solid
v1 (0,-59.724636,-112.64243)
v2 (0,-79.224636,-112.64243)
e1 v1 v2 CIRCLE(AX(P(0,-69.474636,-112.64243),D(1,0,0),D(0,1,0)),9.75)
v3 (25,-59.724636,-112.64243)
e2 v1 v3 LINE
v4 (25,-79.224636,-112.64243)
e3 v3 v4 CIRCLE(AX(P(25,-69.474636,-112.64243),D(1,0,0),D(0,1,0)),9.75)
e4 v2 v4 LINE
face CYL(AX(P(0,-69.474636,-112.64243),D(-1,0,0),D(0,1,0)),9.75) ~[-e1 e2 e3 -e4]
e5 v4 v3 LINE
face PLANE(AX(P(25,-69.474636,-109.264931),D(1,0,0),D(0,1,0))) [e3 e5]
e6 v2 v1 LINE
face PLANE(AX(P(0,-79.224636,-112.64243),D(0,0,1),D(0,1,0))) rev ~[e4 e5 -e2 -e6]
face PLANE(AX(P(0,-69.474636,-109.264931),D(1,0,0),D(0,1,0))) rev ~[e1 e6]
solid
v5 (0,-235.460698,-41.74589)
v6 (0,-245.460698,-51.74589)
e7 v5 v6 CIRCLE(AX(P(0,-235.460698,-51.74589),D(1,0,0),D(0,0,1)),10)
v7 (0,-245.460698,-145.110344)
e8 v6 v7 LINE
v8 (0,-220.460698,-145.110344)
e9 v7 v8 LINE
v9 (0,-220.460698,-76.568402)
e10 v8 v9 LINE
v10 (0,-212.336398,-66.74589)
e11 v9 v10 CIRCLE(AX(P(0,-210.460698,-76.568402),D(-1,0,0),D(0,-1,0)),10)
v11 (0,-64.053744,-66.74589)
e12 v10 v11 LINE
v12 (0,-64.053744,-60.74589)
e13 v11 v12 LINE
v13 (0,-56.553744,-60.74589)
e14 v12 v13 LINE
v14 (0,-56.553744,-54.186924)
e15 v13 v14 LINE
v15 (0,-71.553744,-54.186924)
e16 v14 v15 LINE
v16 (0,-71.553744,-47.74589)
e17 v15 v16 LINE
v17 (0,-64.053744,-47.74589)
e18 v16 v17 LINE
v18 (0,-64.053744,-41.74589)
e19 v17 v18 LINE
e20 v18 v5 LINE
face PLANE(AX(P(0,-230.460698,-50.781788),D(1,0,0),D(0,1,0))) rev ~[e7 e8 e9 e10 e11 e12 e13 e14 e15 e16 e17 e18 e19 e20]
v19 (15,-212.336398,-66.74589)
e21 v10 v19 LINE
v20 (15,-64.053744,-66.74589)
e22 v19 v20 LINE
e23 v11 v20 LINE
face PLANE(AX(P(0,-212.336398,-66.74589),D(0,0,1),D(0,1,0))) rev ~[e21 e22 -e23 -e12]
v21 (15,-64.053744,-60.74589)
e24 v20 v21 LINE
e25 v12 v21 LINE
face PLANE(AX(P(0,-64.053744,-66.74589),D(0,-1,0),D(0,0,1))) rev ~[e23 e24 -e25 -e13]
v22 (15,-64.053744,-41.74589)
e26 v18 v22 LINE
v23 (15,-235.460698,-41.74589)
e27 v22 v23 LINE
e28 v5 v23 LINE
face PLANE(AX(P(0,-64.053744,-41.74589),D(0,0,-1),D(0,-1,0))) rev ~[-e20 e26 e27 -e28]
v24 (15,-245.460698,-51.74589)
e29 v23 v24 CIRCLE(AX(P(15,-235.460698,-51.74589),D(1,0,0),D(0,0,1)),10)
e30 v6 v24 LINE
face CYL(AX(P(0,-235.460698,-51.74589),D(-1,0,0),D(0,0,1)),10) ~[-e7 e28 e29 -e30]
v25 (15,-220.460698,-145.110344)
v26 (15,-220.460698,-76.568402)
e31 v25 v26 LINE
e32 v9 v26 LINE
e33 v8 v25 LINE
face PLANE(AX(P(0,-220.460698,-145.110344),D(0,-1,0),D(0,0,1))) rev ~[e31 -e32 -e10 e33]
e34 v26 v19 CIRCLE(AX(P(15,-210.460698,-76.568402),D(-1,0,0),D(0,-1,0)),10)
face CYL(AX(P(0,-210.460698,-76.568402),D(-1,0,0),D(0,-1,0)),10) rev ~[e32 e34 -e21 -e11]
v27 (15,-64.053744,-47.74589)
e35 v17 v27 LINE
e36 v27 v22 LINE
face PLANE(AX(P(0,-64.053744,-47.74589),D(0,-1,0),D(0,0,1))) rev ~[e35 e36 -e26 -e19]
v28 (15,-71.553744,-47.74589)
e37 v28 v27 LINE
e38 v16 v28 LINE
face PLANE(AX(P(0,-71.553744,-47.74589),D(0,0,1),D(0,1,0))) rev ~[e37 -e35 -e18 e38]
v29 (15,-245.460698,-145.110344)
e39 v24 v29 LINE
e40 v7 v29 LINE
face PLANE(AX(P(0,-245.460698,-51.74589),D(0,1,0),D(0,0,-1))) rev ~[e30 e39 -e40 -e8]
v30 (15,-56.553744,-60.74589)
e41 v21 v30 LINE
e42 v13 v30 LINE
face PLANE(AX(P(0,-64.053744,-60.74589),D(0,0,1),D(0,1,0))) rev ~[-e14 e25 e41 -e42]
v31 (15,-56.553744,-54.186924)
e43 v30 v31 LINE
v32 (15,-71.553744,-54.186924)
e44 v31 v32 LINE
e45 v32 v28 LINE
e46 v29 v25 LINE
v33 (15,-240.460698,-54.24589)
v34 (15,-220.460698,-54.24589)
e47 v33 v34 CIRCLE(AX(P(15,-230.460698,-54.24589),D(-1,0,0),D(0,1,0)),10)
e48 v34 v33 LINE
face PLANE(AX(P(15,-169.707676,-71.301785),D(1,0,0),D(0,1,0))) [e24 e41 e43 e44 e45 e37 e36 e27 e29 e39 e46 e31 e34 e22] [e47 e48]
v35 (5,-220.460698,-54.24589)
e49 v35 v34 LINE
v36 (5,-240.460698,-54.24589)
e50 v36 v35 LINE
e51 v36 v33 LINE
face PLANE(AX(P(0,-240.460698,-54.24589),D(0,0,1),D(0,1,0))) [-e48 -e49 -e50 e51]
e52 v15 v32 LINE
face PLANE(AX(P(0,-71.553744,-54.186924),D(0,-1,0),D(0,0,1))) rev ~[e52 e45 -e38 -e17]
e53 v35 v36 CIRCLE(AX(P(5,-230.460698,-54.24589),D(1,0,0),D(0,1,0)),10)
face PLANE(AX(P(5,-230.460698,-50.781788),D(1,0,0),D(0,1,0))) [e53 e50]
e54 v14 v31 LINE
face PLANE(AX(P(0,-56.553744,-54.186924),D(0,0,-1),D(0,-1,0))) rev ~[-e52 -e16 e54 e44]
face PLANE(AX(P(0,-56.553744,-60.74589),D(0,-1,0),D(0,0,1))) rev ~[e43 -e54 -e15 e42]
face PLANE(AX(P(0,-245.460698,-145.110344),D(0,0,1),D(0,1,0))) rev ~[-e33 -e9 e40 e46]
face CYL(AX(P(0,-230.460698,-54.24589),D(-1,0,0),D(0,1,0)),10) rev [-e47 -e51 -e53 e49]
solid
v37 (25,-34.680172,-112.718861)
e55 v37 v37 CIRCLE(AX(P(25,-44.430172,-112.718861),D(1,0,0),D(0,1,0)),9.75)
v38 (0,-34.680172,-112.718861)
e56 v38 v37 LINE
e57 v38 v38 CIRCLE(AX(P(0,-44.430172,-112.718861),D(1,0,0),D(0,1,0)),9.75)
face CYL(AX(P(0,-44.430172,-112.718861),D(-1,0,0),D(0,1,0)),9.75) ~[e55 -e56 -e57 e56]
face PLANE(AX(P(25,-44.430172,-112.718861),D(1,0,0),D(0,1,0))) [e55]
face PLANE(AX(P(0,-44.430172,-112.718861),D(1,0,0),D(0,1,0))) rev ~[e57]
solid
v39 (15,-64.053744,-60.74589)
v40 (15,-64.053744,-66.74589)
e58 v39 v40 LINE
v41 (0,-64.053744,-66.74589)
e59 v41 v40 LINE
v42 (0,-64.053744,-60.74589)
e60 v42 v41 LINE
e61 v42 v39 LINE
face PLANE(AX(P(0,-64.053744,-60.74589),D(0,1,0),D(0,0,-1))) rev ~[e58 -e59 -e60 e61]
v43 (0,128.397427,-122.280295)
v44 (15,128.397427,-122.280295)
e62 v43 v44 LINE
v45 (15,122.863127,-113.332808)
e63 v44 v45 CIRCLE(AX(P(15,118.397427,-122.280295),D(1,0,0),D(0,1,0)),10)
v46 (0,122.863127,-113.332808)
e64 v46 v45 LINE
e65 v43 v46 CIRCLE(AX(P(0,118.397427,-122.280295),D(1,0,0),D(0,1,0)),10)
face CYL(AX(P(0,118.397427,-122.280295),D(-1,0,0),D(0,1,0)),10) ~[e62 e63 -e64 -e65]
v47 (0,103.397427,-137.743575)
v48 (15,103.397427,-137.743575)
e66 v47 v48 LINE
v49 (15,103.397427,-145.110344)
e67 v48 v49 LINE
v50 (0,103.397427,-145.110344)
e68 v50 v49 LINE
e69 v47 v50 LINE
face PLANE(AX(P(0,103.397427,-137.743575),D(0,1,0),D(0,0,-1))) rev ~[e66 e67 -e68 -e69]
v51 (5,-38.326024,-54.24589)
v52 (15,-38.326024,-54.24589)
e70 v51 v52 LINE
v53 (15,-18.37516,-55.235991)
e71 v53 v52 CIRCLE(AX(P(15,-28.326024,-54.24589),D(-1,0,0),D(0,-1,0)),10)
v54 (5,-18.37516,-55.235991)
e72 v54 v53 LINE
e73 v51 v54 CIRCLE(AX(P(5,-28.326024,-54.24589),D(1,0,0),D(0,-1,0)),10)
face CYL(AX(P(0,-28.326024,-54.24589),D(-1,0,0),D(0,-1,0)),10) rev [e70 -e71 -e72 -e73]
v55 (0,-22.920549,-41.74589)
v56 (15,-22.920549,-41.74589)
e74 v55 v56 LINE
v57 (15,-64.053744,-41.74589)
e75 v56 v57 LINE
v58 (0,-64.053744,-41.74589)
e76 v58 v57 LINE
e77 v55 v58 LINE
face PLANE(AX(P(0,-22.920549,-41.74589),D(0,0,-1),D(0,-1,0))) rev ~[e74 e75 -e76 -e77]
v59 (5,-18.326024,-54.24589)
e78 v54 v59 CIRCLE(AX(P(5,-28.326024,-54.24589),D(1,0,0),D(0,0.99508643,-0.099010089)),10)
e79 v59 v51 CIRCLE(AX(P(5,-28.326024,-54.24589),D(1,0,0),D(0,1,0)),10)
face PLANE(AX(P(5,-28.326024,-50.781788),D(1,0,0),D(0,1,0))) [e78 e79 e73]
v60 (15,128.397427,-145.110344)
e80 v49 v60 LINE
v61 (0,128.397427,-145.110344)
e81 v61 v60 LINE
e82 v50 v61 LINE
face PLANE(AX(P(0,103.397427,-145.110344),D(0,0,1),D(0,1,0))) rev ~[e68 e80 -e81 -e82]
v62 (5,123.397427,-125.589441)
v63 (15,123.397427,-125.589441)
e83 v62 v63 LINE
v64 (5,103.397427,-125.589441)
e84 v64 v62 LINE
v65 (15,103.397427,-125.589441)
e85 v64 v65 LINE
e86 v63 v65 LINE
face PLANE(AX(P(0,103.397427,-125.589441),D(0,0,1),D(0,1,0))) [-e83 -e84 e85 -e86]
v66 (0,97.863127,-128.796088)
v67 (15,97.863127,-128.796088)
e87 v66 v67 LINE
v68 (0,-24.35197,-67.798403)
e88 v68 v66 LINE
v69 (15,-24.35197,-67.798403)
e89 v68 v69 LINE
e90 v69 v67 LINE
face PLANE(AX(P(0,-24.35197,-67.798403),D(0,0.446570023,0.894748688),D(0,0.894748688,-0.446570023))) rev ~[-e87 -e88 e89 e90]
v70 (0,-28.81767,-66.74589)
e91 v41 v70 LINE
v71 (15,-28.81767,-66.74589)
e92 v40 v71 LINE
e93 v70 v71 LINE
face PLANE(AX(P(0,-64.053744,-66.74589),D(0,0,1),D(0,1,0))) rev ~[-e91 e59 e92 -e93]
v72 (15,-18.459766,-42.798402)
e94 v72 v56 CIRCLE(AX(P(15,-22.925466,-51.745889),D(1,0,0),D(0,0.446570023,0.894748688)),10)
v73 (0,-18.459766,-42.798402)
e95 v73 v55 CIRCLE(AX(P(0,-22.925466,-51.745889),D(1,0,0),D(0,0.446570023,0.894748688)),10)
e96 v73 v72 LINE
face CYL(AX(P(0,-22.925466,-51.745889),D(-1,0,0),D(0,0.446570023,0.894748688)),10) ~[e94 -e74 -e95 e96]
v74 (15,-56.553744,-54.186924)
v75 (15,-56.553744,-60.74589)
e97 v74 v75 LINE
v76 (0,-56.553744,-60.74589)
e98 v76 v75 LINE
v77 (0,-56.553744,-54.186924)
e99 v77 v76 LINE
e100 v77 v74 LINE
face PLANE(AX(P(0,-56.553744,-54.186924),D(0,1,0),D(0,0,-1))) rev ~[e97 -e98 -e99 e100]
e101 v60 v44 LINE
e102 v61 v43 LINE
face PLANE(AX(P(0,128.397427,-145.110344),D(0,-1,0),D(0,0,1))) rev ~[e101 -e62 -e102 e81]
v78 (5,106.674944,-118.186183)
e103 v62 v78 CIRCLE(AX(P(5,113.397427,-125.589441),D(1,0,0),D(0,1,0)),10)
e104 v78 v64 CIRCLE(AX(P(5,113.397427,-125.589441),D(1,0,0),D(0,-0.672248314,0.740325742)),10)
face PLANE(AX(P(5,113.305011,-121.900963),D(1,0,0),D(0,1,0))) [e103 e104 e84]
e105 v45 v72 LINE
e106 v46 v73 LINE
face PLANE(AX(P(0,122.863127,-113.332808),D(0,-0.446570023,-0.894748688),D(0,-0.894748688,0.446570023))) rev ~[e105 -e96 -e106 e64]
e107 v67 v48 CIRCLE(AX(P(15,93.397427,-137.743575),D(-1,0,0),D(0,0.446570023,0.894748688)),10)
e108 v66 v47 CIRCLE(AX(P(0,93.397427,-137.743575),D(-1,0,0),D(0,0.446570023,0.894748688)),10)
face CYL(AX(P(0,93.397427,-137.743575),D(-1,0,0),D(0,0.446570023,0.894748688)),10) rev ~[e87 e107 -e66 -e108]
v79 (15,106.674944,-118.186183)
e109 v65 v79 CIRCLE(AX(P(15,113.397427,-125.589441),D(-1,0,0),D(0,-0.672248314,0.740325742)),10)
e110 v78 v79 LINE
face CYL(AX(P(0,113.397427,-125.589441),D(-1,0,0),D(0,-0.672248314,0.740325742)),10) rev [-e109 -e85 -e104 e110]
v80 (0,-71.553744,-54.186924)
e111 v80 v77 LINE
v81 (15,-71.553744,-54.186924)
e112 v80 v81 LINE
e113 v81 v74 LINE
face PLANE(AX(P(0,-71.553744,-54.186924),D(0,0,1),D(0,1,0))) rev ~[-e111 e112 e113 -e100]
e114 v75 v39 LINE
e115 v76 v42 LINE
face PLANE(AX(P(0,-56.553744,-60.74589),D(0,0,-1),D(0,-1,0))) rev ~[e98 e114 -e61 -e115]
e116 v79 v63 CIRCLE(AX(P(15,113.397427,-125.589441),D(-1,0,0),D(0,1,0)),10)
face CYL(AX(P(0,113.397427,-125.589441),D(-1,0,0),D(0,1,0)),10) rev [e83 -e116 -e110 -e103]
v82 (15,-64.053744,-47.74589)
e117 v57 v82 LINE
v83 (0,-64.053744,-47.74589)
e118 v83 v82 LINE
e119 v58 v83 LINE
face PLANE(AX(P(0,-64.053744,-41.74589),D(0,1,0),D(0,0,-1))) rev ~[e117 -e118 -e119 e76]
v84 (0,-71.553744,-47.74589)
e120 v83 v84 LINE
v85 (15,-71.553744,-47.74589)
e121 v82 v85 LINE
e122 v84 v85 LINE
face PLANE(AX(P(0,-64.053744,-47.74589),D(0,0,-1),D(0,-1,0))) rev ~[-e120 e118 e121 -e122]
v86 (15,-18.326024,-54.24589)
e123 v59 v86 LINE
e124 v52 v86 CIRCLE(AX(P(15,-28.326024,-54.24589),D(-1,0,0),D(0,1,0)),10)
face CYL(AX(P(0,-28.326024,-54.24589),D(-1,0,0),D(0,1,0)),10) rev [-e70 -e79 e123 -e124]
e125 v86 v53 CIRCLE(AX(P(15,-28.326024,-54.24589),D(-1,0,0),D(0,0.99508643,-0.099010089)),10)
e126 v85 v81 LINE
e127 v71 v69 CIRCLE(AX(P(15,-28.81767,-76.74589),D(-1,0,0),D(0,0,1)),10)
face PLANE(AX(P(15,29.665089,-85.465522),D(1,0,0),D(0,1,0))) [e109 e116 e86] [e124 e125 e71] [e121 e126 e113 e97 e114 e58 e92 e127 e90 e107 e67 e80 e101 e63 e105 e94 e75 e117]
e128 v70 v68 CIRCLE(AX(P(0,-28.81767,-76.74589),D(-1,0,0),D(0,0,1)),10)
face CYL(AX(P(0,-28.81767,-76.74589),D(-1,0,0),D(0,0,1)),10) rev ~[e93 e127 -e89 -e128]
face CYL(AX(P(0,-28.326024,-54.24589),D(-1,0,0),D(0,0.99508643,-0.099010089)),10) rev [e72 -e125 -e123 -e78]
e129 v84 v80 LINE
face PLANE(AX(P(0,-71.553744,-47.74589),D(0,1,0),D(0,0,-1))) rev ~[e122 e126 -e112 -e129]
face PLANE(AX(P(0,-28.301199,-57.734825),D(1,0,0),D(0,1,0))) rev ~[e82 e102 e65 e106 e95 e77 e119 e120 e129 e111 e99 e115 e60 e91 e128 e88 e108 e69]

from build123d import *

# Parameters (mm, degrees)
F3_DEPTH  = 15
F4_DEPTH  = 25
F5_DEPTH  = 15
F6_DEPTH  = 25
F7_DEPTH  = 25
F8_R      = 9.75
F9_DEPTH  = 25
F10_DEPTH = 5
F11_DEPTH = 5
F12_DEPTH = 5


with BuildPart() as f3:
    # F2 (on Right) → F3 (new body)
    with BuildSketch(Plane.YZ):
        with BuildLine():
            Line((-64.0537443757, -47.7458898533), (-64.0537443757, -41.7458898533))
            Line((-64.0537443757, -41.7458898533), (-235.4606981414, -41.7458898533))
            ThreePointArc((-235.4606981414, -41.7458898533), (-242.5317659533, -44.6748220415), (-245.4606981414, -51.7458898533))
            Line((-245.4606981414, -51.7458898533), (-245.4606981414, -145.1103440631))
            Line((-245.4606981414, -145.1103440631), (-220.4606981414, -145.1103440631))
            Line((-220.4606981414, -145.1103440631), (-220.4606981414, -76.5684022923))
            ThreePointArc((-220.4606981414, -76.5684022923), (-218.1664426563, -70.1949023534), (-212.336397847, -66.7458898533))
            Line((-212.336397847, -66.7458898533), (-64.0537443757, -66.7458898533))
            Line((-64.0537443757, -66.7458898533), (-64.0537443757, -60.7458898533))
            Line((-64.0537443757, -60.7458898533), (-56.5537443757, -60.7458898533))
            Line((-56.5537443757, -60.7458898533), (-56.5537443757, -54.18692423))
            Line((-56.5537443757, -54.18692423), (-71.5537443757, -54.18692423))
            Line((-71.5537443757, -54.18692423), (-71.5537443757, -47.7458898533))
            Line((-71.5537443757, -47.7458898533), (-64.0537443757, -47.7458898533))
        make_face()
    extrude(amount=F3_DEPTH)

    # F1 (on Right) → F4 (cut)
    with BuildSketch(Plane.YZ):
        with BuildLine():
            Line((-230.4606981414, -54.2458898533), (-220.4606981414, -54.2458898533))
            ThreePointArc((-220.4606981414, -54.2458898533), (-230.4606981414, -44.2458898533), (-240.4606981414, -54.2458898533))
            Line((-240.4606981414, -54.2458898533), (-230.4606981414, -54.2458898533))
        make_face()
    extrude(amount=F4_DEPTH, mode=Mode.SUBTRACT)

    # F1 (on Right) → F10 (join)
    with BuildSketch(Plane.YZ):
        with BuildLine():
            Line((-230.4606981414, -54.2458898533), (-220.4606981414, -54.2458898533))
            ThreePointArc((-220.4606981414, -54.2458898533), (-230.4606981414, -44.2458898533), (-240.4606981414, -54.2458898533))
            Line((-240.4606981414, -54.2458898533), (-230.4606981414, -54.2458898533))
        make_face()
    extrude(amount=F10_DEPTH)


with BuildPart() as f5:
    # F2 (on Right) → F5 (new body)
    with BuildSketch(Plane.YZ):
        with BuildLine():
            Line((103.3974266851, -145.1103440631), (128.3974266851, -145.1103440631))
            Line((128.3974266851, -145.1103440631), (128.3974266851, -122.2802950504))
            ThreePointArc((128.3974266851, -122.2802950504), (126.9020431462, -117.0199244505), (122.8631269154, -113.3328081712))
            Line((122.8631269154, -113.3328081712), (-18.4597660903, -42.7984017651))
            ThreePointArc((-18.4597660903, -42.7984017651), (-20.6290450089, -42.0131372779), (-22.9205489159, -41.7458898533))
            Line((-22.9205489159, -41.7458898533), (-64.0537443757, -41.7458898533))
            Line((-64.0537443757, -41.7458898533), (-64.0537443757, -47.7458898533))
            Line((-64.0537443757, -47.7458898533), (-71.5537443757, -47.7458898533))
            Line((-71.5537443757, -47.7458898533), (-71.5537443757, -54.18692423))
            Line((-71.5537443757, -54.18692423), (-56.5537443757, -54.18692423))
            Line((-56.5537443757, -54.18692423), (-56.5537443757, -60.7458898533))
            Line((-56.5537443757, -60.7458898533), (-64.0537443757, -60.7458898533))
            Line((-64.0537443757, -60.7458898533), (-64.0537443757, -66.7458898533))
            Line((-64.0537443757, -66.7458898533), (-28.8176704198, -66.7458898533))
            ThreePointArc((-28.8176704198, -66.7458898533), (-26.5236421715, -67.0125741595), (-24.3519701895, -67.7984029742))
            Line((-24.3519701895, -67.7984029742), (97.8631269154, -128.7960880966))
            ThreePointArc((97.8631269154, -128.7960880966), (101.9020431462, -132.4832043759), (103.3974266851, -137.7435749758))
            Line((103.3974266851, -137.7435749758), (103.3974266851, -145.1103440631))
        make_face()
    extrude(amount=F5_DEPTH)

    # F1 (on Right) → F6 (cut)
    with BuildSketch(Plane.YZ):
        with BuildLine():
            Line((-28.3260242226, -54.2458898533), (-18.3260242226, -54.2458898533))
            ThreePointArc((-18.3260242226, -54.2458898533), (-28.3260242226, -44.2458898533), (-38.3260242226, -54.2458898533))
            Line((-38.3260242226, -54.2458898533), (-28.3260242226, -54.2458898533))
        make_face()
    extrude(amount=F6_DEPTH, mode=Mode.SUBTRACT)

    # F1 (on Right) → F7 (cut)
    with BuildSketch(Plane.YZ):
        with BuildLine():
            ThreePointArc((123.3974266851, -125.5894405546), (117.4455848239, -116.4454580698), (106.6749435485, -118.1861831311))
            ThreePointArc((106.6749435485, -118.1861831311), (104.2534442002, -121.5412824158), (103.3974266851, -125.5894405546))
            Line((103.3974266851, -125.5894405546), (113.3974266851, -125.5894405546))
            Line((113.3974266851, -125.5894405546), (123.3974266851, -125.5894405546))
        make_face()
        with BuildLine():
            ThreePointArc((-18.3751599266, -55.2359907384), (-18.3383157026, -54.741549535), (-18.3260242226, -54.2458898533))
            Line((-18.3260242226, -54.2458898533), (-28.3260242226, -54.2458898533))
            Line((-28.3260242226, -54.2458898533), (-38.3260242226, -54.2458898533))
            ThreePointArc((-38.3260242226, -54.2458898533), (-28.8216839042, -64.2335983733), (-18.3751599266, -55.2359907384))
        make_face()
    extrude(amount=F7_DEPTH, mode=Mode.SUBTRACT)

    # F1 (on Right) → F11 (join)
    with BuildSketch(Plane.YZ):
        with BuildLine():
            Line((-28.3260242226, -54.2458898533), (-18.3260242226, -54.2458898533))
            ThreePointArc((-18.3260242226, -54.2458898533), (-28.3260242226, -44.2458898533), (-38.3260242226, -54.2458898533))
            Line((-38.3260242226, -54.2458898533), (-28.3260242226, -54.2458898533))
        make_face()
        with BuildLine():
            ThreePointArc((123.3974266851, -125.5894405546), (117.4455848239, -116.4454580698), (106.6749435485, -118.1861831311))
            ThreePointArc((106.6749435485, -118.1861831311), (104.2534442002, -121.5412824158), (103.3974266851, -125.5894405546))
            Line((103.3974266851, -125.5894405546), (113.3974266851, -125.5894405546))
            Line((113.3974266851, -125.5894405546), (123.3974266851, -125.5894405546))
        make_face()
    extrude(amount=F11_DEPTH)

    # F1 (on Right) → F12 (join)
    with BuildSketch(Plane.YZ):
        with BuildLine():
            ThreePointArc((-18.3751599266, -55.2359907384), (-18.3383157026, -54.741549535), (-18.3260242226, -54.2458898533))
            Line((-18.3260242226, -54.2458898533), (-28.3260242226, -54.2458898533))
            Line((-28.3260242226, -54.2458898533), (-38.3260242226, -54.2458898533))
            ThreePointArc((-38.3260242226, -54.2458898533), (-28.8216839042, -64.2335983733), (-18.3751599266, -55.2359907384))
        make_face()
    extrude(amount=F12_DEPTH)


with BuildPart() as f9:
    # F8 (on Right) → F9 (new body)
    with BuildSketch(Plane.YZ):
        with Locations((-44.4301724343, -112.7188607796)):
            Circle(F8_R)
    extrude(amount=F9_DEPTH)


with BuildPart() as f9b:
    # F8 (on Right) → F9, piece 2 (new body)
    with BuildSketch(Plane.YZ):
        with BuildLine():
            Line((-69.4746359646, -112.642429769), (-59.7246359646, -112.642429769))
            ThreePointArc((-59.7246359646, -112.642429769), (-69.4746359646, -102.892429769), (-79.2246359646, -112.642429769))
            Line((-79.2246359646, -112.642429769), (-69.4746359646, -112.642429769))
        make_face()
    extrude(amount=F9_DEPTH)


solid = Compound([f3.part, f5.part, f9.part, f9b.part])
